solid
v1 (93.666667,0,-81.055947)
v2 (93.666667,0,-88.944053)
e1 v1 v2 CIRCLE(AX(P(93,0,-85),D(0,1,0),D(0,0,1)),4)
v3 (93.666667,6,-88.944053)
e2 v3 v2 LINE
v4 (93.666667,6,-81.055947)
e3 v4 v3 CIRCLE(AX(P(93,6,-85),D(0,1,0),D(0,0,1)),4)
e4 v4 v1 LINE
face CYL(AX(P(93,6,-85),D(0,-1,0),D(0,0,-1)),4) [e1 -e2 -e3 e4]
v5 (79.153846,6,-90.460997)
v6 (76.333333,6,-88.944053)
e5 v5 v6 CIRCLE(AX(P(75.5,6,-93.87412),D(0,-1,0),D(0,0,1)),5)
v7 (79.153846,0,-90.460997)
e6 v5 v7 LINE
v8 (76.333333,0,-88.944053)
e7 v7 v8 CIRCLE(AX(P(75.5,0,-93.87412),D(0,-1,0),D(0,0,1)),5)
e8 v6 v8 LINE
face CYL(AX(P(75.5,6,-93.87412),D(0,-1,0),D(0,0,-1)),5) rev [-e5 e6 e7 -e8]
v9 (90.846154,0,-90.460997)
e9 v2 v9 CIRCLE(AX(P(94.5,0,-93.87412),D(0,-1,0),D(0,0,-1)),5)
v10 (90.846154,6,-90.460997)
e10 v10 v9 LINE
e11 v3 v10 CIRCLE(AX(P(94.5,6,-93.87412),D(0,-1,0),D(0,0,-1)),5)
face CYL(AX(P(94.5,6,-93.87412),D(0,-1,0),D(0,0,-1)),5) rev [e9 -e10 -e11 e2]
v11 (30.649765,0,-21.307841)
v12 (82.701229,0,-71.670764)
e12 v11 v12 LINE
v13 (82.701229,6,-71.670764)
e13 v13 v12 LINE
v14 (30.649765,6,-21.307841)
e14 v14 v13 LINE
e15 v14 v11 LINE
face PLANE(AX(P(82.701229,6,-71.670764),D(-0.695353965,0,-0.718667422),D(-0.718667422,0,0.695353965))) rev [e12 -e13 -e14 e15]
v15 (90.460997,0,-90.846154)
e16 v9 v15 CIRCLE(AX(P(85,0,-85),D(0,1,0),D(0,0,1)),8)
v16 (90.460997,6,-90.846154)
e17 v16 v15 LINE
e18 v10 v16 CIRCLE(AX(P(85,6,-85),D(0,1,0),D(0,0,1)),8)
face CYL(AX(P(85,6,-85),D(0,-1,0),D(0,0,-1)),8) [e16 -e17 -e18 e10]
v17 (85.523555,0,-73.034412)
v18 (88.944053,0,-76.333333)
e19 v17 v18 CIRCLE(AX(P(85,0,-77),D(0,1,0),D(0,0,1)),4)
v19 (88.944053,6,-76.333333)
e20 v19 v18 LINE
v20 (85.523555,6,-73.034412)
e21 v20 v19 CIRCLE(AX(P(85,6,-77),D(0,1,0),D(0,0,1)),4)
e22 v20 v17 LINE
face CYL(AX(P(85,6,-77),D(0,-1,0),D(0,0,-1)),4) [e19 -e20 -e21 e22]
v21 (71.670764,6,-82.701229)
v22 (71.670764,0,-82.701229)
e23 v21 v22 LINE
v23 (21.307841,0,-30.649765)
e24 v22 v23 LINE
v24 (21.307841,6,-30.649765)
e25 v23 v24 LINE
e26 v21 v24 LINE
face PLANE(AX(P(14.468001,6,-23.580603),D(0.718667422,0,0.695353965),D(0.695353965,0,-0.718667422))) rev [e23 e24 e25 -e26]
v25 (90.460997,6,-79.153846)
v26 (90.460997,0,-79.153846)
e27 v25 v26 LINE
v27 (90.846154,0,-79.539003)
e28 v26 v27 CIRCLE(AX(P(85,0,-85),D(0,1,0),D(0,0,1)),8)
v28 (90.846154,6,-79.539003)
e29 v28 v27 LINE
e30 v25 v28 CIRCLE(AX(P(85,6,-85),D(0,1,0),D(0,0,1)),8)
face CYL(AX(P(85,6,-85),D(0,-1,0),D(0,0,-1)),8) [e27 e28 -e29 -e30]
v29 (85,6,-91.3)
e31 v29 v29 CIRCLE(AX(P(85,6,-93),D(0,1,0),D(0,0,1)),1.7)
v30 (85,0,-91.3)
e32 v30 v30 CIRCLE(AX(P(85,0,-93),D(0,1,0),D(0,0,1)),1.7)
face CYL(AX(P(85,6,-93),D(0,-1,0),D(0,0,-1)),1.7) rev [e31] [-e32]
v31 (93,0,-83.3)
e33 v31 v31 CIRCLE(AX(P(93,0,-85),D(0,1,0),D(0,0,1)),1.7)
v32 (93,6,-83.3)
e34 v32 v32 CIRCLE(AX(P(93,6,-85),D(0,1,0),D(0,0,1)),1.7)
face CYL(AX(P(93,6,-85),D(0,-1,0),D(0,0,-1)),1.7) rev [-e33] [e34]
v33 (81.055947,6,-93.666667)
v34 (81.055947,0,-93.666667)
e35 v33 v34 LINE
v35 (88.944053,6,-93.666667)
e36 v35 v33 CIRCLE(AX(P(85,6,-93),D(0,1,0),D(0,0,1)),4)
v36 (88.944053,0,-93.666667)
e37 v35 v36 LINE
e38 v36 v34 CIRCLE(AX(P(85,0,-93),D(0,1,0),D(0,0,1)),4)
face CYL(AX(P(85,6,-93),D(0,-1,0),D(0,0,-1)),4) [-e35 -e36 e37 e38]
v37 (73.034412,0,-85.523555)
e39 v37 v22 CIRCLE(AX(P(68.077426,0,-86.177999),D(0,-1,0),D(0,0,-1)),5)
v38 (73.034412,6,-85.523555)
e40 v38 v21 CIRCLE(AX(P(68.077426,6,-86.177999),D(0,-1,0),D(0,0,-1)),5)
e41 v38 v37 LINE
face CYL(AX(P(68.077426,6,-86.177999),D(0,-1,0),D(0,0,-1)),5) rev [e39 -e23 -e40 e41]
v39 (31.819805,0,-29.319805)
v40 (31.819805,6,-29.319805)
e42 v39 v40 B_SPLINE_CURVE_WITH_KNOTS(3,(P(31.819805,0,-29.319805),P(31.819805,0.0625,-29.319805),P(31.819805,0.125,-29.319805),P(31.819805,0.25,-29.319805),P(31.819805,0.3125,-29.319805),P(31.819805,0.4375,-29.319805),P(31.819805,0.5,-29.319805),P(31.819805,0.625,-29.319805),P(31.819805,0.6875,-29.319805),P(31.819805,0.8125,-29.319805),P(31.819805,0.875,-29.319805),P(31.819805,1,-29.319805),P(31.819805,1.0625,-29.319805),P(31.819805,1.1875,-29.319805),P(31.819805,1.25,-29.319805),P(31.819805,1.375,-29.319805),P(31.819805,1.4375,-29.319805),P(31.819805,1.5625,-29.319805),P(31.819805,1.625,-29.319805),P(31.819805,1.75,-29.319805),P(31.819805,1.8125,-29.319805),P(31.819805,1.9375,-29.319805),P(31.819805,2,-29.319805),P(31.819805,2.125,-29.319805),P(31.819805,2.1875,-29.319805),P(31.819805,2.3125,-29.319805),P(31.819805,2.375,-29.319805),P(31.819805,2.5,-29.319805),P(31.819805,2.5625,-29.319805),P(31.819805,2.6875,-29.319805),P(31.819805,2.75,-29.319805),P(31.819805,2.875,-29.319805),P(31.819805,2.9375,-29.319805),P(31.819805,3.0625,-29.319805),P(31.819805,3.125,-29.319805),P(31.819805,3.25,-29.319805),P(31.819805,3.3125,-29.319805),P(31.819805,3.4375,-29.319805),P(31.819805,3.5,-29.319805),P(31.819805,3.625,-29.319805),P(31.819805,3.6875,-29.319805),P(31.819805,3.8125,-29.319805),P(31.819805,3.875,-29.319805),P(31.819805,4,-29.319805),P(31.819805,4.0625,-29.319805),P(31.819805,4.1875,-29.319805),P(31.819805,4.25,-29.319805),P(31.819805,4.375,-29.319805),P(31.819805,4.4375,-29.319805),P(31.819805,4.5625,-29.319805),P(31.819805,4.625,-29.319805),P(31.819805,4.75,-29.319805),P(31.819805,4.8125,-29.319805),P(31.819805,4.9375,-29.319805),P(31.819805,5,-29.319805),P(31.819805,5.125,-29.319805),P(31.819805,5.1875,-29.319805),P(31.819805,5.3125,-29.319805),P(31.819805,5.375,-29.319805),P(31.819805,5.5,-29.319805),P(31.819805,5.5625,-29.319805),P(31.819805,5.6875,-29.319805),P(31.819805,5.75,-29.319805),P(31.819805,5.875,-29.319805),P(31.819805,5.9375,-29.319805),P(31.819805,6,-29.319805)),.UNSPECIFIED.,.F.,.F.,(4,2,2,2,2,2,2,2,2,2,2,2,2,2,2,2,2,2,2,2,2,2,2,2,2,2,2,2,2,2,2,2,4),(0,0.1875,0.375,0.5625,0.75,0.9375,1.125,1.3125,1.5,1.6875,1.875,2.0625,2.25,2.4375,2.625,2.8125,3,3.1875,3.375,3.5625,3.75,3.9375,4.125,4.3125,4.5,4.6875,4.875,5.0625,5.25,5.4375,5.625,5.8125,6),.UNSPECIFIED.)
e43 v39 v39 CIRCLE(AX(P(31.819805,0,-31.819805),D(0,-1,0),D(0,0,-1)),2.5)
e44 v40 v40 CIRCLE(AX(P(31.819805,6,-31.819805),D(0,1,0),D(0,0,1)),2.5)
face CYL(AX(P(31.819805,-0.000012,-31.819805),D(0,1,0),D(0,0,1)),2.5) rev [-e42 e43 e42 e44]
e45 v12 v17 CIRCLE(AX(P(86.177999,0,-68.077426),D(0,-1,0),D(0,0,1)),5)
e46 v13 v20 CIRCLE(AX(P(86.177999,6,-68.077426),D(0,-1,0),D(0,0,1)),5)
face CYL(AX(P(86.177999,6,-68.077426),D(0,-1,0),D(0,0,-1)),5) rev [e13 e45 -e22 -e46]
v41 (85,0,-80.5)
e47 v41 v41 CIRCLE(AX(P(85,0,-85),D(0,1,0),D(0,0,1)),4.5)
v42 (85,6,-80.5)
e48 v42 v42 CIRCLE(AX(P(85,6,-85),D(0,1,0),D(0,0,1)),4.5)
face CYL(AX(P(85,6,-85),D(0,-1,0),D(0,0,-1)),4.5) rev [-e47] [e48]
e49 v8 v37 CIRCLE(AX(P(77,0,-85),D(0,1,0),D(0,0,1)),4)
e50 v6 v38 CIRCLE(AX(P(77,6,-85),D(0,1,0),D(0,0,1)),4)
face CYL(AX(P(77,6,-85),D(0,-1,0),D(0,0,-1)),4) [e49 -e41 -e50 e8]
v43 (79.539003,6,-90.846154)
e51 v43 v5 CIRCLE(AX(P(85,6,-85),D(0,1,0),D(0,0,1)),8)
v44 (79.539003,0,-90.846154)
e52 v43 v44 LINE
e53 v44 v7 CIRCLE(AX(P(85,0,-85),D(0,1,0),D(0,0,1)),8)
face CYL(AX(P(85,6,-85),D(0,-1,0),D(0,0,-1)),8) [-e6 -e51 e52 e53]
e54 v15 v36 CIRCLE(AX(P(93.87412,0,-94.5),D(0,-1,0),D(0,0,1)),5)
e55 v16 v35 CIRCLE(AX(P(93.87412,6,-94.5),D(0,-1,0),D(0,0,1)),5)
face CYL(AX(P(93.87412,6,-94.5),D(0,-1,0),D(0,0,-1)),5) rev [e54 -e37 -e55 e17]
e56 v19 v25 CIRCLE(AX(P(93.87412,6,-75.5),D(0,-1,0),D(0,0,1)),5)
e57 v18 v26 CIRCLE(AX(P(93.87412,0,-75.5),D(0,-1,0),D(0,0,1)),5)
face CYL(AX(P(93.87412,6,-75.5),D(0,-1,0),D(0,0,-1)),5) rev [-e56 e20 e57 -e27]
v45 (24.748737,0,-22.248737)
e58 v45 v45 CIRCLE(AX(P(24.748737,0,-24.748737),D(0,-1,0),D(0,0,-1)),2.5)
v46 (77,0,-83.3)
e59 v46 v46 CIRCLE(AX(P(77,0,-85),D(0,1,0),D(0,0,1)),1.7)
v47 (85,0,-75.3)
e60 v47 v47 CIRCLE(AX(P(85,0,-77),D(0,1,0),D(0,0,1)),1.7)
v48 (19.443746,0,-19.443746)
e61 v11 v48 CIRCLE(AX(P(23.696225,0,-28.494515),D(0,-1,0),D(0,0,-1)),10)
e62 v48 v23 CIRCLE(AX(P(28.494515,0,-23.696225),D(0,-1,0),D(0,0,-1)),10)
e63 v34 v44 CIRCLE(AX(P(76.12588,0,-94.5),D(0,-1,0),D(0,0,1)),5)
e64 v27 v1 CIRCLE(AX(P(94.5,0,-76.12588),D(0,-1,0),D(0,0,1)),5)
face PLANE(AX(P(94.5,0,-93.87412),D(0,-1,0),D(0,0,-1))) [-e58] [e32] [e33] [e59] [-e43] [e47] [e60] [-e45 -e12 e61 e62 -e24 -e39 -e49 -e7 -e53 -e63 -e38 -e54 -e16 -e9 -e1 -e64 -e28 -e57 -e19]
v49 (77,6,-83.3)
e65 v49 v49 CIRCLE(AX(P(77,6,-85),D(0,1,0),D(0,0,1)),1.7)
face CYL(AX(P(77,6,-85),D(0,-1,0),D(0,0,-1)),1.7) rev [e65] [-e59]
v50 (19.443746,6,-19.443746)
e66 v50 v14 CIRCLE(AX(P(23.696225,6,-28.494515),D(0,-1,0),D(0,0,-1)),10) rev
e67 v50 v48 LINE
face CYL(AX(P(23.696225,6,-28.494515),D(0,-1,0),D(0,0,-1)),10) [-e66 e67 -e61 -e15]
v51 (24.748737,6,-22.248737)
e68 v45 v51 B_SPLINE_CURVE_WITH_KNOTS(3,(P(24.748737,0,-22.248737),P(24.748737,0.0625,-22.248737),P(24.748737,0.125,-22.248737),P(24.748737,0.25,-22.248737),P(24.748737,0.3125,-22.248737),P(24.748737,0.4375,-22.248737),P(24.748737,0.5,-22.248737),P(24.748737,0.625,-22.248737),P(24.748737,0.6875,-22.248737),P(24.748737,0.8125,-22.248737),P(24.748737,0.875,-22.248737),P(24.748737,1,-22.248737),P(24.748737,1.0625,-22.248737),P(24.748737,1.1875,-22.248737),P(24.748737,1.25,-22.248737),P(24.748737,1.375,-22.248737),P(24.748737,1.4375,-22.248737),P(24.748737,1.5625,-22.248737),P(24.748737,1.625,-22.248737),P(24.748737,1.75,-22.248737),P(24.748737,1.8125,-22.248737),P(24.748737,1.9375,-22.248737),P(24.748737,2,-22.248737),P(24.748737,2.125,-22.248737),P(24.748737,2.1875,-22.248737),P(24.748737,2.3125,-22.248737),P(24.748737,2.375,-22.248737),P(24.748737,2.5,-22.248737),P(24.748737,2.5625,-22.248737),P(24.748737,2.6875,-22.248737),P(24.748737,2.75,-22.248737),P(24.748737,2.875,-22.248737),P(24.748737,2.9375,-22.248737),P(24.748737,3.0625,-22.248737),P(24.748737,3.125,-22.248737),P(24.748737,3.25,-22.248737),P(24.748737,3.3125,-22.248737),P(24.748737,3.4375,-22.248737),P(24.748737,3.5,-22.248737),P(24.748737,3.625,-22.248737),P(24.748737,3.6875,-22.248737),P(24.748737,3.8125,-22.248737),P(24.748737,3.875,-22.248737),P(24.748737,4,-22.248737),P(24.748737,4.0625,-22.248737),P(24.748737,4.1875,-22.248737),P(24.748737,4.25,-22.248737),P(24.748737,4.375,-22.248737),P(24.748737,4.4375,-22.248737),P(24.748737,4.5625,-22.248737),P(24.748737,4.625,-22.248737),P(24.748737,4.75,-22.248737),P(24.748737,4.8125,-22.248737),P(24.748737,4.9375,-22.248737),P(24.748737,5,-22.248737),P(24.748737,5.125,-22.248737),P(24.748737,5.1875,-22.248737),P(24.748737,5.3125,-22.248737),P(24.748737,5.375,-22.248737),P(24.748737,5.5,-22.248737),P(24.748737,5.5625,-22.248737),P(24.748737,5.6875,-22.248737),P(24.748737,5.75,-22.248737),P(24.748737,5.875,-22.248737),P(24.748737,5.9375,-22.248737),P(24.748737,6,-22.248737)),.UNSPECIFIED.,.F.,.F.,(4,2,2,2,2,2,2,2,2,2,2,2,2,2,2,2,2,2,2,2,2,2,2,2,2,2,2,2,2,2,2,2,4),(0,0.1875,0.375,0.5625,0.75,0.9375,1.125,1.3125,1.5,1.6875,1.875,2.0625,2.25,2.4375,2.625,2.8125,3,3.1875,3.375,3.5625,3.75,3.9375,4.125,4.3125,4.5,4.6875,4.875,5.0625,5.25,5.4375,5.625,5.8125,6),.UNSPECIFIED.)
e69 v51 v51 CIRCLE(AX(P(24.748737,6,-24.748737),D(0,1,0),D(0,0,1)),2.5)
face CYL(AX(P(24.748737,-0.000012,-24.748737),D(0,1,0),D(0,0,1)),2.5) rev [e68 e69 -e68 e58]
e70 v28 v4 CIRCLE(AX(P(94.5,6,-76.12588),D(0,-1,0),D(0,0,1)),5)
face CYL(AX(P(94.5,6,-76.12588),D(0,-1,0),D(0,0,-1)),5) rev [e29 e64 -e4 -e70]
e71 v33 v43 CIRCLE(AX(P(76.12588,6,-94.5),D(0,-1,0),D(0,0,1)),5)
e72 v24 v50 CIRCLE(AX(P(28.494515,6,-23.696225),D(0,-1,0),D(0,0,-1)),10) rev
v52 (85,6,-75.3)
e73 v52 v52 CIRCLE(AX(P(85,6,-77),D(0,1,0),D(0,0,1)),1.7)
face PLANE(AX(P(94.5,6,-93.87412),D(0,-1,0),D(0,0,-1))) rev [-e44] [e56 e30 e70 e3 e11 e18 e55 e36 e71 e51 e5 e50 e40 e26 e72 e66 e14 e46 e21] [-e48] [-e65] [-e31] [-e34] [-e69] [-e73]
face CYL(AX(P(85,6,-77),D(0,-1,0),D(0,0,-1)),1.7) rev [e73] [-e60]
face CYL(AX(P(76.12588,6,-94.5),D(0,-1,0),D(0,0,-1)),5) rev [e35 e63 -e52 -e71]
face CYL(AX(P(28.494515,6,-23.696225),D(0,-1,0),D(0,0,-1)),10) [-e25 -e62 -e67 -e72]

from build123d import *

# Parameters (mm, degrees)
SKETCH2_R               = 1.7
SKETCH2_R_2             = 4.5
BOSS_EXTRUDE1_DEPTH     = 6
FILLET1_R               = 10
CUT_EXTRUDE2_DEPTH      = 138.309868546
CUT_EXTRUDE2_DEPTH_BACK = 138.309868546
SKETCH7_R               = 2.5


with BuildPart() as part:
    # Sketch2 → Boss-Extrude1 (new body)
    with BuildSketch(Plane(origin=(0, 0, 0), x_dir=(1, 0, 0), z_dir=(0, 1, 0))):
        with BuildLine():
            Line((82.701229094, 71.670763572), (23.580603164, 14.468001358))
            Line((23.580603164, 14.468001358), (14.468001358, 23.580603164))
            Line((14.468001358, 23.580603164), (71.670763572, 82.701229094))
            ThreePointArc((71.670763572, 82.701229094), (72.579468699, 84.002771186), (73.034411761, 85.523555075))
            ThreePointArc((73.034411761, 85.523555075), (74.120868496, 87.776797037), (76.333333333, 88.944053189))
            ThreePointArc((76.333333333, 88.944053189), (77.868327334, 89.470595445), (79.153846154, 90.460996723))
            ThreePointArc((79.153846154, 90.460996723), (79.343145751, 90.656854249), (79.539003277, 90.846153846))
            ThreePointArc((79.539003277, 90.846153846), (80.529404555, 92.131672666), (81.055946811, 93.666666667))
            ThreePointArc((81.055946811, 93.666666667), (85, 97), (88.944053189, 93.666666667))
            ThreePointArc((88.944053189, 93.666666667), (89.470595445, 92.131672666), (90.460996723, 90.846153846))
            ThreePointArc((90.460996723, 90.846153846), (90.656854249, 90.656854249), (90.846153846, 90.460996723))
            ThreePointArc((90.846153846, 90.460996723), (92.131672666, 89.470595445), (93.666666667, 88.944053189))
            ThreePointArc((93.666666667, 88.944053189), (97, 85), (93.666666667, 81.055946811))
            ThreePointArc((93.666666667, 81.055946811), (92.131672666, 80.529404555), (90.846153846, 79.539003277))
            ThreePointArc((90.846153846, 79.539003277), (90.656854249, 79.343145751), (90.460996723, 79.153846154))
            ThreePointArc((90.460996723, 79.153846154), (89.470595445, 77.868327334), (88.944053189, 76.333333333))
            ThreePointArc((88.944053189, 76.333333333), (87.776797037, 74.120868496), (85.523555075, 73.034411761))
            ThreePointArc((85.523555075, 73.034411761), (84.002771186, 72.579468699), (82.701229094, 71.670763572))
        make_face()
        with Locations(Location((85, 93, 0), (0, 0, 270))):
            Circle(SKETCH2_R, mode=Mode.SUBTRACT)
        with Locations(Location((93, 85, 0), (0, 0, 270))):
            Circle(SKETCH2_R, mode=Mode.SUBTRACT)
        with Locations(Location((85, 77, 0), (0, 0, 270))):
            Circle(SKETCH2_R, mode=Mode.SUBTRACT)
        with Locations(Location((77, 85, 0), (0, 0, 270))):
            Circle(SKETCH2_R, mode=Mode.SUBTRACT)
        with Locations(Location((85, 85, 0), (0, 0, 270))):
            Circle(SKETCH2_R_2, mode=Mode.SUBTRACT)
    extrude(amount=BOSS_EXTRUDE1_DEPTH)

    # Fillet1
    # the kernel refuses this fillet: 10 mm, written as the material it takes off along each edge
    with BuildSketch(Plane(origin=(23.580603164, -24.591214075, -14.468001358), x_dir=(0.71866742198992, 0, -0.6953539649490483), z_dir=(0, 1, 0)), Plane(origin=(14.468001358, -24.591214075, -23.580603164), x_dir=(0.7071067811865477, 0, 0.7071067811865475), z_dir=(0, 1, 0))) as fillet1_piece_1:
        with BuildLine():
            CenterArc((FILLET1_R * 0.983648563013, FILLET1_R), FILLET1_R, 180.944569645, 89.055430355)
            Line((-FILLET1_R * 0.0162155484343, FILLET1_R * 0.983514896433), (0, 0))
            Line((0, 0), (FILLET1_R * 0.983648563013, 0))
        make_face()
    extrude(amount=55.182428151, mode=Mode.SUBTRACT)

    # Sketch7 → Cut-Extrude2 (cut, two sides: drawn at the far end of the back side and taken through both)
    with BuildSketch(Plane(origin=(0, 0, 0), x_dir=(1, 0, 0), z_dir=(0, 1, 0)).offset(-CUT_EXTRUDE2_DEPTH_BACK)):
        with Locations(Location((24.748737342, 24.748737342, 0), (0, 0, 270))):
            Circle(SKETCH7_R)
        with Locations(Location((31.819805153, 31.819805153, 0), (0, 0, 270))):
            Circle(SKETCH7_R)
    extrude(amount=CUT_EXTRUDE2_DEPTH + CUT_EXTRUDE2_DEPTH_BACK, mode=Mode.SUBTRACT)


solid = part.part
